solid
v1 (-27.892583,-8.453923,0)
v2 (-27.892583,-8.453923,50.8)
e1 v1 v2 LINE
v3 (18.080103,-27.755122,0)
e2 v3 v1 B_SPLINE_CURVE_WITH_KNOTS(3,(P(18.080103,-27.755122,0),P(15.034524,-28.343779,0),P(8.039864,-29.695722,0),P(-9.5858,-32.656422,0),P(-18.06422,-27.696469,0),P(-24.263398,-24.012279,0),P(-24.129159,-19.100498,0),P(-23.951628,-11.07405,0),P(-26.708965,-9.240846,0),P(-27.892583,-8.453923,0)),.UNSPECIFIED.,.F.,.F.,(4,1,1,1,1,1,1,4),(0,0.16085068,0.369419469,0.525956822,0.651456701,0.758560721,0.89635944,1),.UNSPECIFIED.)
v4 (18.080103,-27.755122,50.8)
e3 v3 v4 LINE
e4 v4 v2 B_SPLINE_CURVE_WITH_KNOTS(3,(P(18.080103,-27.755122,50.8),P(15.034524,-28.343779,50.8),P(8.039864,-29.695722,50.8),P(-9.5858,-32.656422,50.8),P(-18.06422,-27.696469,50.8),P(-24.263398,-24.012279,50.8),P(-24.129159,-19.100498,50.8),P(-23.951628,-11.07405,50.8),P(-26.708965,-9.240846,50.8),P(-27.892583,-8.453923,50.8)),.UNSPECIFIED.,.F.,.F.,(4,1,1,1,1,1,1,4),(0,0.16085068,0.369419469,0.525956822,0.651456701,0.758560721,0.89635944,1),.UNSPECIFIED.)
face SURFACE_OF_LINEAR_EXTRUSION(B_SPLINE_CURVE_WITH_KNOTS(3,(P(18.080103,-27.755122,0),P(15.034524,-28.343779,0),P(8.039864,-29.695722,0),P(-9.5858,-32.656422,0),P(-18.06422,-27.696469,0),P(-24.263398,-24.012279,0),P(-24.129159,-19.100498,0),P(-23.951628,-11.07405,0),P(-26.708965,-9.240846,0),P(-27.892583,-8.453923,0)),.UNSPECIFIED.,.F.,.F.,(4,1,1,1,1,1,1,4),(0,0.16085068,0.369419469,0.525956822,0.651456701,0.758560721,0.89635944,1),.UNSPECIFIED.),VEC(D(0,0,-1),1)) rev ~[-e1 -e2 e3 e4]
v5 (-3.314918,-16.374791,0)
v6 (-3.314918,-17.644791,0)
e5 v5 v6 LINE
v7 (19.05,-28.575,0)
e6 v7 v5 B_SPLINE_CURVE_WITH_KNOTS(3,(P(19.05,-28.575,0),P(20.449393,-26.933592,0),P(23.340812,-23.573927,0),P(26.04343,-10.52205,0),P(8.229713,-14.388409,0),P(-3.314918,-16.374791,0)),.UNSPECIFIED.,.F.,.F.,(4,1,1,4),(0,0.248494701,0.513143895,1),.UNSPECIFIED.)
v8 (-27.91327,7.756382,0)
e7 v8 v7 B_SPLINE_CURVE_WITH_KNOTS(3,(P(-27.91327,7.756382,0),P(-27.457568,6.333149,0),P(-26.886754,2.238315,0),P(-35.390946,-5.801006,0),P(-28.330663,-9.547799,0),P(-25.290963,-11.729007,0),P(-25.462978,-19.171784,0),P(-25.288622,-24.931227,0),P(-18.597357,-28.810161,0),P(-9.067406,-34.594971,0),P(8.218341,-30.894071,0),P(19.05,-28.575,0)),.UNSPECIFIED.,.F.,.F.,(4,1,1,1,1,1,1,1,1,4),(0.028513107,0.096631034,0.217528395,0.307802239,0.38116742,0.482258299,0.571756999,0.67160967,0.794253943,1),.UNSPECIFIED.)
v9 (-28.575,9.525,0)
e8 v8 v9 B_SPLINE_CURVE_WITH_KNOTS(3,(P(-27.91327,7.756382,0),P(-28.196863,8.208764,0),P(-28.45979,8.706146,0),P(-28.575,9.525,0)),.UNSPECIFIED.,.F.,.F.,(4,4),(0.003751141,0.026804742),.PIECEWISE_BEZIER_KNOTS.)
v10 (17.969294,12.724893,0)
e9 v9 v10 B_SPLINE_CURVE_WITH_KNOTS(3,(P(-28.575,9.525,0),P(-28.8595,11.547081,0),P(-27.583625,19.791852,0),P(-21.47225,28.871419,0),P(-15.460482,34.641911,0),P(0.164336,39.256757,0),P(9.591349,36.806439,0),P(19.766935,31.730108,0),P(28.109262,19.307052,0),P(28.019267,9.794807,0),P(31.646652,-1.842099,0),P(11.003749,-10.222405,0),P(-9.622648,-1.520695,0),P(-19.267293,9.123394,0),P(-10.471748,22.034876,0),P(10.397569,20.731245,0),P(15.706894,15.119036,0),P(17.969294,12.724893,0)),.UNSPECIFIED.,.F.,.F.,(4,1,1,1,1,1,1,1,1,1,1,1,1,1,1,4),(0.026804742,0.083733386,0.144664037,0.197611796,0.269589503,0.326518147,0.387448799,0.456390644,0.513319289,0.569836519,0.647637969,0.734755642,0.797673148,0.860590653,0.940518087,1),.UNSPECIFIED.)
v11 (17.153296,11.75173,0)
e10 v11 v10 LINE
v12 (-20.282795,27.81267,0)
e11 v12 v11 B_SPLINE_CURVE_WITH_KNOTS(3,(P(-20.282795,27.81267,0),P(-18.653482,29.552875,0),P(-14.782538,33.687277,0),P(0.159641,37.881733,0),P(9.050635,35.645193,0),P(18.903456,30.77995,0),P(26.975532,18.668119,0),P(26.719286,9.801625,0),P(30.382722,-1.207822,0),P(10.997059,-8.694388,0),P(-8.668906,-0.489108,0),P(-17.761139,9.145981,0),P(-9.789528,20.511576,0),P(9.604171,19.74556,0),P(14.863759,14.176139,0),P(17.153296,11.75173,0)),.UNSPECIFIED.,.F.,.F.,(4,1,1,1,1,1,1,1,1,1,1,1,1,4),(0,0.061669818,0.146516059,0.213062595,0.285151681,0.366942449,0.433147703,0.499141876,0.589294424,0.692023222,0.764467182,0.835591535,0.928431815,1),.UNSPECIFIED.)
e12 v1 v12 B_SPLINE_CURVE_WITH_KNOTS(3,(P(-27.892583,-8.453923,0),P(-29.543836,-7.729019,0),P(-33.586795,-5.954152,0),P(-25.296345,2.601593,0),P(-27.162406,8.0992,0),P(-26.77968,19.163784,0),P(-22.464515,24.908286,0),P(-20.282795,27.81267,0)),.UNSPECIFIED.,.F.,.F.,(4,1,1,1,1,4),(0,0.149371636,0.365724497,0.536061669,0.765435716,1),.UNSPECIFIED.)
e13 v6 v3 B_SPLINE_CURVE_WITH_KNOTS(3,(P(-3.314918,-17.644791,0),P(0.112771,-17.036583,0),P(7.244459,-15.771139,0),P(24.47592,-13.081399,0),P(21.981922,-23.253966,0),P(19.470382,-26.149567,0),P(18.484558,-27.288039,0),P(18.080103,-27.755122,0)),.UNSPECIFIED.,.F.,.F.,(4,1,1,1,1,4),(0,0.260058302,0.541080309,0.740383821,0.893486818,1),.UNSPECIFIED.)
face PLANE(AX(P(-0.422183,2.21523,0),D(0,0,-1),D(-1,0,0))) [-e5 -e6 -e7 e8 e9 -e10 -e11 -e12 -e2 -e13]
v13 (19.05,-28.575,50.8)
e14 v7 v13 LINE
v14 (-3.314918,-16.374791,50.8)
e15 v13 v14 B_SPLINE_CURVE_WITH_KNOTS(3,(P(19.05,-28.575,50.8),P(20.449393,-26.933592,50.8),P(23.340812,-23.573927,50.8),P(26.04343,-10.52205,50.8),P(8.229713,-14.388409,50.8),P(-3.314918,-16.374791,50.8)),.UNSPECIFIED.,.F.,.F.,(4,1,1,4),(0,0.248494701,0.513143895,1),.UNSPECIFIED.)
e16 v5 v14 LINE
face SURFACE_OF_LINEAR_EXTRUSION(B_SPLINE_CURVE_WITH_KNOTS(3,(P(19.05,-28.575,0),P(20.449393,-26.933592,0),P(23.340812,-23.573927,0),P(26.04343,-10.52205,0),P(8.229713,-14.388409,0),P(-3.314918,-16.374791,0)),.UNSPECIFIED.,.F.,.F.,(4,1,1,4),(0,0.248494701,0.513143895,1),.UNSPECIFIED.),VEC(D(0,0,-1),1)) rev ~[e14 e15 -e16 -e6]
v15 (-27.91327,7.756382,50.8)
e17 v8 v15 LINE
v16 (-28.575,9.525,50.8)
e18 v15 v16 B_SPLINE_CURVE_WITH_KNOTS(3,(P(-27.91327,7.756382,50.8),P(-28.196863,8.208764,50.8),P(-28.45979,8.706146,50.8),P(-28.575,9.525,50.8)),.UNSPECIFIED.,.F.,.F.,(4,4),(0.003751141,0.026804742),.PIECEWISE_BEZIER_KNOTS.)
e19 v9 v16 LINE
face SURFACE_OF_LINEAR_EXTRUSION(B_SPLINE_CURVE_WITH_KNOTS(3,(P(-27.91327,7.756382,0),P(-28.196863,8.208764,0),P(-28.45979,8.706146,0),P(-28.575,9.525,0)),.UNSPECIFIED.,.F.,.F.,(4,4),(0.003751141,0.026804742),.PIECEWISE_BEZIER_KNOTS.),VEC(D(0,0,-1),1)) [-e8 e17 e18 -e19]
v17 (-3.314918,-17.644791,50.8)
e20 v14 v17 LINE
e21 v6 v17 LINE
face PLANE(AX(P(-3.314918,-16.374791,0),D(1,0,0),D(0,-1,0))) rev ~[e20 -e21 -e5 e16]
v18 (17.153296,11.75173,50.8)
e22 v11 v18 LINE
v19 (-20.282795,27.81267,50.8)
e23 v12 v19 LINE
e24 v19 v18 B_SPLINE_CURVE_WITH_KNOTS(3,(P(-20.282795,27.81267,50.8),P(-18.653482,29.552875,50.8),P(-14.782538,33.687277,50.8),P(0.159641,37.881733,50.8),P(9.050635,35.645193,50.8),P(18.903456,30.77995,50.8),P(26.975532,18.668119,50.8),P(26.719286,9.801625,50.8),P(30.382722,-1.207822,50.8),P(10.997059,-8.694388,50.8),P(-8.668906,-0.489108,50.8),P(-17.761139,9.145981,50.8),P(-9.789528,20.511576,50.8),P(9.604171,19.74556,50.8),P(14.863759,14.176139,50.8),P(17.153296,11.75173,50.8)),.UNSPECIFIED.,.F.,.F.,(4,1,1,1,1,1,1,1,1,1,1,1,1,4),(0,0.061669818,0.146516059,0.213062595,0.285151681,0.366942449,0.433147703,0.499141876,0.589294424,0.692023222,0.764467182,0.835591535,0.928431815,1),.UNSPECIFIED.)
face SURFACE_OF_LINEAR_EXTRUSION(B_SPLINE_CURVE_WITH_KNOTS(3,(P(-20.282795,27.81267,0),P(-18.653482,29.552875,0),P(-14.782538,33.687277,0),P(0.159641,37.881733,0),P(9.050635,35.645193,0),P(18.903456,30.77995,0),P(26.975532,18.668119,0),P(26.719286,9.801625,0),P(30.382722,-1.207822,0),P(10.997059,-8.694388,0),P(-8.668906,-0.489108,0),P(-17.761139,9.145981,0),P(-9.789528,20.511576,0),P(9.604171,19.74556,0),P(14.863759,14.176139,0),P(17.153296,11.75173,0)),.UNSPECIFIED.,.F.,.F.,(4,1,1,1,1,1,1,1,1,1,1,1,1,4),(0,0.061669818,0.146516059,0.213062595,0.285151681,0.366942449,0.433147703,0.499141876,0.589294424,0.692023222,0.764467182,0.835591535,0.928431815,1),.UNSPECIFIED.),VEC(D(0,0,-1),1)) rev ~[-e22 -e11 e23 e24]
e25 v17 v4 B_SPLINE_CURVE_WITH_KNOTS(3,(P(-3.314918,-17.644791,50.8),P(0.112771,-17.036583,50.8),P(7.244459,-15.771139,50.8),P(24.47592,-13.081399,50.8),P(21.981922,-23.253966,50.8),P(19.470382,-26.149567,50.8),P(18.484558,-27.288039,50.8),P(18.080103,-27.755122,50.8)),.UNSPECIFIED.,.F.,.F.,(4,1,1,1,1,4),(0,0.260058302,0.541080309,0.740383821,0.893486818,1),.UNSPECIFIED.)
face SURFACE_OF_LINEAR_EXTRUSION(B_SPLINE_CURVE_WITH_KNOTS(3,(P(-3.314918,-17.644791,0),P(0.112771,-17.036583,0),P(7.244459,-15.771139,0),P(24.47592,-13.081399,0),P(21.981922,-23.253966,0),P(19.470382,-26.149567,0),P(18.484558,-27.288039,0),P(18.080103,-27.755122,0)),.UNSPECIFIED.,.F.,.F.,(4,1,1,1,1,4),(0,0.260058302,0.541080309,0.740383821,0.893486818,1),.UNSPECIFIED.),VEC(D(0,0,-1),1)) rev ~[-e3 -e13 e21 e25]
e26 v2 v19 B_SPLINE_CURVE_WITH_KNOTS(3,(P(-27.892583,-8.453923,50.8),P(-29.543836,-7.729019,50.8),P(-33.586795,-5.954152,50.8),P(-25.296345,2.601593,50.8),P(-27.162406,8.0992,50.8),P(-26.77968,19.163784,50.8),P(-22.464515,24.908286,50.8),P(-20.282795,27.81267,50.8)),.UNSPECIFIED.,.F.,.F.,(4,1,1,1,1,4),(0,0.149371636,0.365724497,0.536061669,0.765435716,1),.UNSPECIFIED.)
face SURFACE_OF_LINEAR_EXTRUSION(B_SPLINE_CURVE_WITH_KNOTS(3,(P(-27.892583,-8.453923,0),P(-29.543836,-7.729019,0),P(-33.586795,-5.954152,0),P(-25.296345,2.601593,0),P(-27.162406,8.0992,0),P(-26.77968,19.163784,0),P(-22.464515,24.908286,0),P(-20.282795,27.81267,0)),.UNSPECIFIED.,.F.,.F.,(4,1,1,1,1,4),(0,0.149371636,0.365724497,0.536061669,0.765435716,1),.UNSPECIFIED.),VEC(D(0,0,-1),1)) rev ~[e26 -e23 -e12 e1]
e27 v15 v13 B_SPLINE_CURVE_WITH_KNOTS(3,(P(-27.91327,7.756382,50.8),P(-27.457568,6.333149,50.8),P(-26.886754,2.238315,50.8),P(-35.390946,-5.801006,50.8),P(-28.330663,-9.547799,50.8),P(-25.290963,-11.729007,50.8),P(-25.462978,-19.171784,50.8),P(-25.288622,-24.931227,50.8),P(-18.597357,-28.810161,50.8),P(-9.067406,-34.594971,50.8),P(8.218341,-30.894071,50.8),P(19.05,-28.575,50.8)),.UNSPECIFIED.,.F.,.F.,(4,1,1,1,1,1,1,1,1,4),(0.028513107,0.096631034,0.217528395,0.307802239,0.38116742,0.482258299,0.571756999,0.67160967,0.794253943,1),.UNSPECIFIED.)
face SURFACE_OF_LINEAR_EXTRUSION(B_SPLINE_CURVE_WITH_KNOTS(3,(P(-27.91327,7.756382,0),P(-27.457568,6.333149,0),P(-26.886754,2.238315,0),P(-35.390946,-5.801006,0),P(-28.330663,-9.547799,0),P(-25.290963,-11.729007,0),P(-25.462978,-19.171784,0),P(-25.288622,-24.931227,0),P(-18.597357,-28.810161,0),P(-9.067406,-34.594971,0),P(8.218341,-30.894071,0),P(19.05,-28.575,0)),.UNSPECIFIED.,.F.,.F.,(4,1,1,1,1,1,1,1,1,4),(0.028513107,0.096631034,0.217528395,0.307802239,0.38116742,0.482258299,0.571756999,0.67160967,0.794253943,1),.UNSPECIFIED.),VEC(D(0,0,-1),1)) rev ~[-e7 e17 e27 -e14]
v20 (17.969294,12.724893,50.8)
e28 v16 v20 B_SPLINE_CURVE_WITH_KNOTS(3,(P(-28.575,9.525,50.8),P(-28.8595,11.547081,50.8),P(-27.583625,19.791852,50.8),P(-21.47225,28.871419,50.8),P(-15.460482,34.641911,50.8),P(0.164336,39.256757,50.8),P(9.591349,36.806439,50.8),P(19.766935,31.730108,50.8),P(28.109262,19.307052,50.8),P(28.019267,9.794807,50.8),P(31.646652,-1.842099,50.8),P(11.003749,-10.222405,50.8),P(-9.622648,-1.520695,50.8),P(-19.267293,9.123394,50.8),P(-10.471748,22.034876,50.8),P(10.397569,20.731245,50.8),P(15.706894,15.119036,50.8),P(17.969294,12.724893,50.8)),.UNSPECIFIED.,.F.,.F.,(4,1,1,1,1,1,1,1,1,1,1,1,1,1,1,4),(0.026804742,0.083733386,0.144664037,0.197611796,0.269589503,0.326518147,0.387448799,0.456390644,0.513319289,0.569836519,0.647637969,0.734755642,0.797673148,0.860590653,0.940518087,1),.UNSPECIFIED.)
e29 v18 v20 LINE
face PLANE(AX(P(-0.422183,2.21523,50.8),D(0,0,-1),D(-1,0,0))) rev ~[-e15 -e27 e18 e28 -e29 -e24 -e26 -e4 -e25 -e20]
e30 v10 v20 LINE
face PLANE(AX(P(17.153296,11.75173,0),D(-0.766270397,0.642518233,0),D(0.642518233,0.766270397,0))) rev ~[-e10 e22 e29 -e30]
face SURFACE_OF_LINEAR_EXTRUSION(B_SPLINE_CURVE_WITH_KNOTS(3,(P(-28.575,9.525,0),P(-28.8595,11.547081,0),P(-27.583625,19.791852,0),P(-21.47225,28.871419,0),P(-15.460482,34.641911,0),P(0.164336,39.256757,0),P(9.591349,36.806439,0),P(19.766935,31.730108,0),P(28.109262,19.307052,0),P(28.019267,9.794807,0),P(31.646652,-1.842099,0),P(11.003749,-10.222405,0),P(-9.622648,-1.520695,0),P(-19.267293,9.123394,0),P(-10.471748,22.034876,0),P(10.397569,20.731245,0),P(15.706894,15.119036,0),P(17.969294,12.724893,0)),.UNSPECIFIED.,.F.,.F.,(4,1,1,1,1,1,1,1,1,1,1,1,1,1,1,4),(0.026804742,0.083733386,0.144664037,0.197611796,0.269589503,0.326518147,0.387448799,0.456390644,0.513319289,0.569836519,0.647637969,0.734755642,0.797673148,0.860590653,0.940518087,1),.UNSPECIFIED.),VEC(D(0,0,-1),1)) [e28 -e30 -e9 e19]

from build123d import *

# Parameters (mm, degrees)
F1_DEPTH = 50.8


with BuildPart() as f1:
    # F0 (on Top) → F1 (new body)
    with BuildSketch(Plane.XY):
        with BuildLine():
            add(Edge.make_bspline(
                [(-28.575, 9.525), (-28.8594996524, 11.5470812082), (-27.583625005, 19.7918515313), (-21.4722499031, 28.8714189263), (-15.4604819758, 34.6419109157), (0.1643363583, 39.2567574305), (9.5913489365, 36.8064392809), (19.7669349831, 31.7301076931), (28.1092618759, 19.3070522169), (28.01926673, 9.7948073112), (31.6466517803, -1.8420994785), (11.0037494052, -10.2224046216), (-9.6226479792, -1.5206953626), (-19.2672929112, 9.1233944662), (-10.4717480482, 22.0348756544), (10.3975685161, 20.7312450611), (15.7068943524, 15.1190361927), (17.9692939765, 12.7248933616)],
                knots=[0.0268047416, 0.0268047416, 0.0268047416, 0.0268047416, 0.0837333862, 0.1446640373, 0.1976117956, 0.2695895028, 0.3265181474, 0.3874487985, 0.4563906441, 0.5133192887, 0.5698365194, 0.6476379692, 0.7347556422, 0.7976731476, 0.8605906529, 0.9405180871, 1, 1, 1, 1], degree=3))
            add(Edge.make_bspline(
                [(-28.575, 9.525), (-28.3385715748, 8.9386739216), (-28.1040202058, 8.3521252843), (-27.9132703579, 7.7563821144)],
                knots=[0, 0, 0, 0, 0.0285131067, 0.0285131067, 0.0285131067, 0.0285131067], degree=3))
            add(Edge.make_bspline(
                [(-27.9132703579, 7.7563821144), (-27.457568198, 6.3331492672), (-26.8867535963, 2.2383154089), (-35.3909456885, -5.8010055969), (-28.3306633549, -9.5477989192), (-25.290962526, -11.7290065998), (-25.4629784715, -19.1717840144), (-25.2886215487, -24.9312265481), (-18.5973573035, -28.8101607796), (-9.0674060529, -34.5949711254), (8.2183413475, -30.8940706711), (19.05, -28.575)],
                knots=[0.0285131067, 0.0285131067, 0.0285131067, 0.0285131067, 0.0966310342, 0.2175283955, 0.3078022388, 0.3811674198, 0.4822582987, 0.5717569993, 0.6716096703, 0.7942539425, 1, 1, 1, 1], degree=3))
            add(Edge.make_bspline(
                [(19.05, -28.575), (20.449393147, -26.9335917203), (23.340812467, -23.5739270293), (26.0434304421, -10.5220498003), (8.2297129353, -14.3884085752), (-3.314917673, -16.3747909325)],
                knots=[0, 0, 0, 0, 0.2484947009, 0.5131438955, 1, 1, 1, 1], degree=3))
            Line((-3.314917673, -16.3747909325), (-3.314917673, -17.6447909325))
            add(Edge.make_bspline(
                [(-3.314917673, -17.6447909325), (0.1127708121, -17.0365832342), (7.2444590959, -15.7711392667), (24.4759204402, -13.0813986392), (21.9819222972, -23.2539656867), (19.4703820637, -26.1495666985), (18.4845582884, -27.288039337), (18.0801026493, -27.7551224914)],
                knots=[0, 0, 0, 0, 0.2600583017, 0.5410803086, 0.7403838213, 0.8934868177, 1, 1, 1, 1], degree=3))
            add(Edge.make_bspline(
                [(18.0801026493, -27.7551224914), (15.0345243093, -28.3437785038), (8.0398635799, -29.6957217585), (-9.585799738, -32.6564215448), (-18.0642196498, -27.6964687931), (-24.2633978347, -24.0122788001), (-24.1291593864, -19.1004975599), (-23.9516284245, -11.0740502335), (-26.7089648656, -9.2408462263), (-27.8925829323, -8.4539225305)],
                knots=[0, 0, 0, 0, 0.1608506796, 0.3694194686, 0.5259568215, 0.6514567009, 0.7585607213, 0.8963594402, 1, 1, 1, 1], degree=3))
            add(Edge.make_bspline(
                [(-27.8925829323, -8.4539225305), (-29.5438355642, -7.7290194845), (-33.5867954962, -5.9541523849), (-25.2963448806, 2.6015927727), (-27.162405802, 8.0991997717), (-26.7796800648, 19.1637843035), (-22.4645149675, 24.9082864328), (-20.2827948032, 27.8126703548)],
                knots=[0, 0, 0, 0, 0.1493716357, 0.365724497, 0.5360616686, 0.7654357157, 1, 1, 1, 1], degree=3))
            add(Edge.make_bspline(
                [(-20.2827948032, 27.8126703548), (-18.6534822427, 29.5528745857), (-14.7825375405, 33.6872773464), (0.1596409555, 37.8817329306), (9.0506352198, 35.6451933741), (18.9034559835, 30.7799498212), (26.9755324876, 18.6681192726), (26.7192855021, 9.8016253637), (30.3827219691, -1.2078222302), (10.9970588246, -8.6943882218), (-8.6689055778, -0.4891080049), (-17.761138526, 9.1459809357), (-9.7895282246, 20.5115764549), (9.6041710088, 19.7455600414), (14.8637592867, 14.1761389432), (17.1532958212, 11.7517299578)],
                knots=[0, 0, 0, 0, 0.0616698181, 0.1465160593, 0.2130625953, 0.2851516815, 0.3669424489, 0.433147703, 0.4991418759, 0.5892944238, 0.6920232222, 0.7644671824, 0.8355915351, 0.928431815, 1, 1, 1, 1], degree=3))
            Line((17.1532958212, 11.7517299578), (17.9692939765, 12.7248933616))
        make_face()
        with BuildLine():
            add(Edge.make_bspline(
                [(-28.575, 9.525), (-28.3385715748, 8.9386739216), (-28.1040202058, 8.3521252843), (-27.9132703579, 7.7563821144)],
                knots=[0, 0, 0, 0, 0.0285131067, 0.0285131067, 0.0285131067, 0.0285131067], degree=3))
            add(Edge.make_bspline(
                [(-27.9132703579, 7.7563821144), (-28.1968626586, 8.2087644493), (-28.4597901387, 8.7061459399), (-28.575, 9.525)],
                knots=[0.0037511414, 0.0037511414, 0.0037511414, 0.0037511414, 0.0268047416, 0.0268047416, 0.0268047416, 0.0268047416], degree=3))
        make_face()
    extrude(amount=F1_DEPTH)


solid = f1.part
